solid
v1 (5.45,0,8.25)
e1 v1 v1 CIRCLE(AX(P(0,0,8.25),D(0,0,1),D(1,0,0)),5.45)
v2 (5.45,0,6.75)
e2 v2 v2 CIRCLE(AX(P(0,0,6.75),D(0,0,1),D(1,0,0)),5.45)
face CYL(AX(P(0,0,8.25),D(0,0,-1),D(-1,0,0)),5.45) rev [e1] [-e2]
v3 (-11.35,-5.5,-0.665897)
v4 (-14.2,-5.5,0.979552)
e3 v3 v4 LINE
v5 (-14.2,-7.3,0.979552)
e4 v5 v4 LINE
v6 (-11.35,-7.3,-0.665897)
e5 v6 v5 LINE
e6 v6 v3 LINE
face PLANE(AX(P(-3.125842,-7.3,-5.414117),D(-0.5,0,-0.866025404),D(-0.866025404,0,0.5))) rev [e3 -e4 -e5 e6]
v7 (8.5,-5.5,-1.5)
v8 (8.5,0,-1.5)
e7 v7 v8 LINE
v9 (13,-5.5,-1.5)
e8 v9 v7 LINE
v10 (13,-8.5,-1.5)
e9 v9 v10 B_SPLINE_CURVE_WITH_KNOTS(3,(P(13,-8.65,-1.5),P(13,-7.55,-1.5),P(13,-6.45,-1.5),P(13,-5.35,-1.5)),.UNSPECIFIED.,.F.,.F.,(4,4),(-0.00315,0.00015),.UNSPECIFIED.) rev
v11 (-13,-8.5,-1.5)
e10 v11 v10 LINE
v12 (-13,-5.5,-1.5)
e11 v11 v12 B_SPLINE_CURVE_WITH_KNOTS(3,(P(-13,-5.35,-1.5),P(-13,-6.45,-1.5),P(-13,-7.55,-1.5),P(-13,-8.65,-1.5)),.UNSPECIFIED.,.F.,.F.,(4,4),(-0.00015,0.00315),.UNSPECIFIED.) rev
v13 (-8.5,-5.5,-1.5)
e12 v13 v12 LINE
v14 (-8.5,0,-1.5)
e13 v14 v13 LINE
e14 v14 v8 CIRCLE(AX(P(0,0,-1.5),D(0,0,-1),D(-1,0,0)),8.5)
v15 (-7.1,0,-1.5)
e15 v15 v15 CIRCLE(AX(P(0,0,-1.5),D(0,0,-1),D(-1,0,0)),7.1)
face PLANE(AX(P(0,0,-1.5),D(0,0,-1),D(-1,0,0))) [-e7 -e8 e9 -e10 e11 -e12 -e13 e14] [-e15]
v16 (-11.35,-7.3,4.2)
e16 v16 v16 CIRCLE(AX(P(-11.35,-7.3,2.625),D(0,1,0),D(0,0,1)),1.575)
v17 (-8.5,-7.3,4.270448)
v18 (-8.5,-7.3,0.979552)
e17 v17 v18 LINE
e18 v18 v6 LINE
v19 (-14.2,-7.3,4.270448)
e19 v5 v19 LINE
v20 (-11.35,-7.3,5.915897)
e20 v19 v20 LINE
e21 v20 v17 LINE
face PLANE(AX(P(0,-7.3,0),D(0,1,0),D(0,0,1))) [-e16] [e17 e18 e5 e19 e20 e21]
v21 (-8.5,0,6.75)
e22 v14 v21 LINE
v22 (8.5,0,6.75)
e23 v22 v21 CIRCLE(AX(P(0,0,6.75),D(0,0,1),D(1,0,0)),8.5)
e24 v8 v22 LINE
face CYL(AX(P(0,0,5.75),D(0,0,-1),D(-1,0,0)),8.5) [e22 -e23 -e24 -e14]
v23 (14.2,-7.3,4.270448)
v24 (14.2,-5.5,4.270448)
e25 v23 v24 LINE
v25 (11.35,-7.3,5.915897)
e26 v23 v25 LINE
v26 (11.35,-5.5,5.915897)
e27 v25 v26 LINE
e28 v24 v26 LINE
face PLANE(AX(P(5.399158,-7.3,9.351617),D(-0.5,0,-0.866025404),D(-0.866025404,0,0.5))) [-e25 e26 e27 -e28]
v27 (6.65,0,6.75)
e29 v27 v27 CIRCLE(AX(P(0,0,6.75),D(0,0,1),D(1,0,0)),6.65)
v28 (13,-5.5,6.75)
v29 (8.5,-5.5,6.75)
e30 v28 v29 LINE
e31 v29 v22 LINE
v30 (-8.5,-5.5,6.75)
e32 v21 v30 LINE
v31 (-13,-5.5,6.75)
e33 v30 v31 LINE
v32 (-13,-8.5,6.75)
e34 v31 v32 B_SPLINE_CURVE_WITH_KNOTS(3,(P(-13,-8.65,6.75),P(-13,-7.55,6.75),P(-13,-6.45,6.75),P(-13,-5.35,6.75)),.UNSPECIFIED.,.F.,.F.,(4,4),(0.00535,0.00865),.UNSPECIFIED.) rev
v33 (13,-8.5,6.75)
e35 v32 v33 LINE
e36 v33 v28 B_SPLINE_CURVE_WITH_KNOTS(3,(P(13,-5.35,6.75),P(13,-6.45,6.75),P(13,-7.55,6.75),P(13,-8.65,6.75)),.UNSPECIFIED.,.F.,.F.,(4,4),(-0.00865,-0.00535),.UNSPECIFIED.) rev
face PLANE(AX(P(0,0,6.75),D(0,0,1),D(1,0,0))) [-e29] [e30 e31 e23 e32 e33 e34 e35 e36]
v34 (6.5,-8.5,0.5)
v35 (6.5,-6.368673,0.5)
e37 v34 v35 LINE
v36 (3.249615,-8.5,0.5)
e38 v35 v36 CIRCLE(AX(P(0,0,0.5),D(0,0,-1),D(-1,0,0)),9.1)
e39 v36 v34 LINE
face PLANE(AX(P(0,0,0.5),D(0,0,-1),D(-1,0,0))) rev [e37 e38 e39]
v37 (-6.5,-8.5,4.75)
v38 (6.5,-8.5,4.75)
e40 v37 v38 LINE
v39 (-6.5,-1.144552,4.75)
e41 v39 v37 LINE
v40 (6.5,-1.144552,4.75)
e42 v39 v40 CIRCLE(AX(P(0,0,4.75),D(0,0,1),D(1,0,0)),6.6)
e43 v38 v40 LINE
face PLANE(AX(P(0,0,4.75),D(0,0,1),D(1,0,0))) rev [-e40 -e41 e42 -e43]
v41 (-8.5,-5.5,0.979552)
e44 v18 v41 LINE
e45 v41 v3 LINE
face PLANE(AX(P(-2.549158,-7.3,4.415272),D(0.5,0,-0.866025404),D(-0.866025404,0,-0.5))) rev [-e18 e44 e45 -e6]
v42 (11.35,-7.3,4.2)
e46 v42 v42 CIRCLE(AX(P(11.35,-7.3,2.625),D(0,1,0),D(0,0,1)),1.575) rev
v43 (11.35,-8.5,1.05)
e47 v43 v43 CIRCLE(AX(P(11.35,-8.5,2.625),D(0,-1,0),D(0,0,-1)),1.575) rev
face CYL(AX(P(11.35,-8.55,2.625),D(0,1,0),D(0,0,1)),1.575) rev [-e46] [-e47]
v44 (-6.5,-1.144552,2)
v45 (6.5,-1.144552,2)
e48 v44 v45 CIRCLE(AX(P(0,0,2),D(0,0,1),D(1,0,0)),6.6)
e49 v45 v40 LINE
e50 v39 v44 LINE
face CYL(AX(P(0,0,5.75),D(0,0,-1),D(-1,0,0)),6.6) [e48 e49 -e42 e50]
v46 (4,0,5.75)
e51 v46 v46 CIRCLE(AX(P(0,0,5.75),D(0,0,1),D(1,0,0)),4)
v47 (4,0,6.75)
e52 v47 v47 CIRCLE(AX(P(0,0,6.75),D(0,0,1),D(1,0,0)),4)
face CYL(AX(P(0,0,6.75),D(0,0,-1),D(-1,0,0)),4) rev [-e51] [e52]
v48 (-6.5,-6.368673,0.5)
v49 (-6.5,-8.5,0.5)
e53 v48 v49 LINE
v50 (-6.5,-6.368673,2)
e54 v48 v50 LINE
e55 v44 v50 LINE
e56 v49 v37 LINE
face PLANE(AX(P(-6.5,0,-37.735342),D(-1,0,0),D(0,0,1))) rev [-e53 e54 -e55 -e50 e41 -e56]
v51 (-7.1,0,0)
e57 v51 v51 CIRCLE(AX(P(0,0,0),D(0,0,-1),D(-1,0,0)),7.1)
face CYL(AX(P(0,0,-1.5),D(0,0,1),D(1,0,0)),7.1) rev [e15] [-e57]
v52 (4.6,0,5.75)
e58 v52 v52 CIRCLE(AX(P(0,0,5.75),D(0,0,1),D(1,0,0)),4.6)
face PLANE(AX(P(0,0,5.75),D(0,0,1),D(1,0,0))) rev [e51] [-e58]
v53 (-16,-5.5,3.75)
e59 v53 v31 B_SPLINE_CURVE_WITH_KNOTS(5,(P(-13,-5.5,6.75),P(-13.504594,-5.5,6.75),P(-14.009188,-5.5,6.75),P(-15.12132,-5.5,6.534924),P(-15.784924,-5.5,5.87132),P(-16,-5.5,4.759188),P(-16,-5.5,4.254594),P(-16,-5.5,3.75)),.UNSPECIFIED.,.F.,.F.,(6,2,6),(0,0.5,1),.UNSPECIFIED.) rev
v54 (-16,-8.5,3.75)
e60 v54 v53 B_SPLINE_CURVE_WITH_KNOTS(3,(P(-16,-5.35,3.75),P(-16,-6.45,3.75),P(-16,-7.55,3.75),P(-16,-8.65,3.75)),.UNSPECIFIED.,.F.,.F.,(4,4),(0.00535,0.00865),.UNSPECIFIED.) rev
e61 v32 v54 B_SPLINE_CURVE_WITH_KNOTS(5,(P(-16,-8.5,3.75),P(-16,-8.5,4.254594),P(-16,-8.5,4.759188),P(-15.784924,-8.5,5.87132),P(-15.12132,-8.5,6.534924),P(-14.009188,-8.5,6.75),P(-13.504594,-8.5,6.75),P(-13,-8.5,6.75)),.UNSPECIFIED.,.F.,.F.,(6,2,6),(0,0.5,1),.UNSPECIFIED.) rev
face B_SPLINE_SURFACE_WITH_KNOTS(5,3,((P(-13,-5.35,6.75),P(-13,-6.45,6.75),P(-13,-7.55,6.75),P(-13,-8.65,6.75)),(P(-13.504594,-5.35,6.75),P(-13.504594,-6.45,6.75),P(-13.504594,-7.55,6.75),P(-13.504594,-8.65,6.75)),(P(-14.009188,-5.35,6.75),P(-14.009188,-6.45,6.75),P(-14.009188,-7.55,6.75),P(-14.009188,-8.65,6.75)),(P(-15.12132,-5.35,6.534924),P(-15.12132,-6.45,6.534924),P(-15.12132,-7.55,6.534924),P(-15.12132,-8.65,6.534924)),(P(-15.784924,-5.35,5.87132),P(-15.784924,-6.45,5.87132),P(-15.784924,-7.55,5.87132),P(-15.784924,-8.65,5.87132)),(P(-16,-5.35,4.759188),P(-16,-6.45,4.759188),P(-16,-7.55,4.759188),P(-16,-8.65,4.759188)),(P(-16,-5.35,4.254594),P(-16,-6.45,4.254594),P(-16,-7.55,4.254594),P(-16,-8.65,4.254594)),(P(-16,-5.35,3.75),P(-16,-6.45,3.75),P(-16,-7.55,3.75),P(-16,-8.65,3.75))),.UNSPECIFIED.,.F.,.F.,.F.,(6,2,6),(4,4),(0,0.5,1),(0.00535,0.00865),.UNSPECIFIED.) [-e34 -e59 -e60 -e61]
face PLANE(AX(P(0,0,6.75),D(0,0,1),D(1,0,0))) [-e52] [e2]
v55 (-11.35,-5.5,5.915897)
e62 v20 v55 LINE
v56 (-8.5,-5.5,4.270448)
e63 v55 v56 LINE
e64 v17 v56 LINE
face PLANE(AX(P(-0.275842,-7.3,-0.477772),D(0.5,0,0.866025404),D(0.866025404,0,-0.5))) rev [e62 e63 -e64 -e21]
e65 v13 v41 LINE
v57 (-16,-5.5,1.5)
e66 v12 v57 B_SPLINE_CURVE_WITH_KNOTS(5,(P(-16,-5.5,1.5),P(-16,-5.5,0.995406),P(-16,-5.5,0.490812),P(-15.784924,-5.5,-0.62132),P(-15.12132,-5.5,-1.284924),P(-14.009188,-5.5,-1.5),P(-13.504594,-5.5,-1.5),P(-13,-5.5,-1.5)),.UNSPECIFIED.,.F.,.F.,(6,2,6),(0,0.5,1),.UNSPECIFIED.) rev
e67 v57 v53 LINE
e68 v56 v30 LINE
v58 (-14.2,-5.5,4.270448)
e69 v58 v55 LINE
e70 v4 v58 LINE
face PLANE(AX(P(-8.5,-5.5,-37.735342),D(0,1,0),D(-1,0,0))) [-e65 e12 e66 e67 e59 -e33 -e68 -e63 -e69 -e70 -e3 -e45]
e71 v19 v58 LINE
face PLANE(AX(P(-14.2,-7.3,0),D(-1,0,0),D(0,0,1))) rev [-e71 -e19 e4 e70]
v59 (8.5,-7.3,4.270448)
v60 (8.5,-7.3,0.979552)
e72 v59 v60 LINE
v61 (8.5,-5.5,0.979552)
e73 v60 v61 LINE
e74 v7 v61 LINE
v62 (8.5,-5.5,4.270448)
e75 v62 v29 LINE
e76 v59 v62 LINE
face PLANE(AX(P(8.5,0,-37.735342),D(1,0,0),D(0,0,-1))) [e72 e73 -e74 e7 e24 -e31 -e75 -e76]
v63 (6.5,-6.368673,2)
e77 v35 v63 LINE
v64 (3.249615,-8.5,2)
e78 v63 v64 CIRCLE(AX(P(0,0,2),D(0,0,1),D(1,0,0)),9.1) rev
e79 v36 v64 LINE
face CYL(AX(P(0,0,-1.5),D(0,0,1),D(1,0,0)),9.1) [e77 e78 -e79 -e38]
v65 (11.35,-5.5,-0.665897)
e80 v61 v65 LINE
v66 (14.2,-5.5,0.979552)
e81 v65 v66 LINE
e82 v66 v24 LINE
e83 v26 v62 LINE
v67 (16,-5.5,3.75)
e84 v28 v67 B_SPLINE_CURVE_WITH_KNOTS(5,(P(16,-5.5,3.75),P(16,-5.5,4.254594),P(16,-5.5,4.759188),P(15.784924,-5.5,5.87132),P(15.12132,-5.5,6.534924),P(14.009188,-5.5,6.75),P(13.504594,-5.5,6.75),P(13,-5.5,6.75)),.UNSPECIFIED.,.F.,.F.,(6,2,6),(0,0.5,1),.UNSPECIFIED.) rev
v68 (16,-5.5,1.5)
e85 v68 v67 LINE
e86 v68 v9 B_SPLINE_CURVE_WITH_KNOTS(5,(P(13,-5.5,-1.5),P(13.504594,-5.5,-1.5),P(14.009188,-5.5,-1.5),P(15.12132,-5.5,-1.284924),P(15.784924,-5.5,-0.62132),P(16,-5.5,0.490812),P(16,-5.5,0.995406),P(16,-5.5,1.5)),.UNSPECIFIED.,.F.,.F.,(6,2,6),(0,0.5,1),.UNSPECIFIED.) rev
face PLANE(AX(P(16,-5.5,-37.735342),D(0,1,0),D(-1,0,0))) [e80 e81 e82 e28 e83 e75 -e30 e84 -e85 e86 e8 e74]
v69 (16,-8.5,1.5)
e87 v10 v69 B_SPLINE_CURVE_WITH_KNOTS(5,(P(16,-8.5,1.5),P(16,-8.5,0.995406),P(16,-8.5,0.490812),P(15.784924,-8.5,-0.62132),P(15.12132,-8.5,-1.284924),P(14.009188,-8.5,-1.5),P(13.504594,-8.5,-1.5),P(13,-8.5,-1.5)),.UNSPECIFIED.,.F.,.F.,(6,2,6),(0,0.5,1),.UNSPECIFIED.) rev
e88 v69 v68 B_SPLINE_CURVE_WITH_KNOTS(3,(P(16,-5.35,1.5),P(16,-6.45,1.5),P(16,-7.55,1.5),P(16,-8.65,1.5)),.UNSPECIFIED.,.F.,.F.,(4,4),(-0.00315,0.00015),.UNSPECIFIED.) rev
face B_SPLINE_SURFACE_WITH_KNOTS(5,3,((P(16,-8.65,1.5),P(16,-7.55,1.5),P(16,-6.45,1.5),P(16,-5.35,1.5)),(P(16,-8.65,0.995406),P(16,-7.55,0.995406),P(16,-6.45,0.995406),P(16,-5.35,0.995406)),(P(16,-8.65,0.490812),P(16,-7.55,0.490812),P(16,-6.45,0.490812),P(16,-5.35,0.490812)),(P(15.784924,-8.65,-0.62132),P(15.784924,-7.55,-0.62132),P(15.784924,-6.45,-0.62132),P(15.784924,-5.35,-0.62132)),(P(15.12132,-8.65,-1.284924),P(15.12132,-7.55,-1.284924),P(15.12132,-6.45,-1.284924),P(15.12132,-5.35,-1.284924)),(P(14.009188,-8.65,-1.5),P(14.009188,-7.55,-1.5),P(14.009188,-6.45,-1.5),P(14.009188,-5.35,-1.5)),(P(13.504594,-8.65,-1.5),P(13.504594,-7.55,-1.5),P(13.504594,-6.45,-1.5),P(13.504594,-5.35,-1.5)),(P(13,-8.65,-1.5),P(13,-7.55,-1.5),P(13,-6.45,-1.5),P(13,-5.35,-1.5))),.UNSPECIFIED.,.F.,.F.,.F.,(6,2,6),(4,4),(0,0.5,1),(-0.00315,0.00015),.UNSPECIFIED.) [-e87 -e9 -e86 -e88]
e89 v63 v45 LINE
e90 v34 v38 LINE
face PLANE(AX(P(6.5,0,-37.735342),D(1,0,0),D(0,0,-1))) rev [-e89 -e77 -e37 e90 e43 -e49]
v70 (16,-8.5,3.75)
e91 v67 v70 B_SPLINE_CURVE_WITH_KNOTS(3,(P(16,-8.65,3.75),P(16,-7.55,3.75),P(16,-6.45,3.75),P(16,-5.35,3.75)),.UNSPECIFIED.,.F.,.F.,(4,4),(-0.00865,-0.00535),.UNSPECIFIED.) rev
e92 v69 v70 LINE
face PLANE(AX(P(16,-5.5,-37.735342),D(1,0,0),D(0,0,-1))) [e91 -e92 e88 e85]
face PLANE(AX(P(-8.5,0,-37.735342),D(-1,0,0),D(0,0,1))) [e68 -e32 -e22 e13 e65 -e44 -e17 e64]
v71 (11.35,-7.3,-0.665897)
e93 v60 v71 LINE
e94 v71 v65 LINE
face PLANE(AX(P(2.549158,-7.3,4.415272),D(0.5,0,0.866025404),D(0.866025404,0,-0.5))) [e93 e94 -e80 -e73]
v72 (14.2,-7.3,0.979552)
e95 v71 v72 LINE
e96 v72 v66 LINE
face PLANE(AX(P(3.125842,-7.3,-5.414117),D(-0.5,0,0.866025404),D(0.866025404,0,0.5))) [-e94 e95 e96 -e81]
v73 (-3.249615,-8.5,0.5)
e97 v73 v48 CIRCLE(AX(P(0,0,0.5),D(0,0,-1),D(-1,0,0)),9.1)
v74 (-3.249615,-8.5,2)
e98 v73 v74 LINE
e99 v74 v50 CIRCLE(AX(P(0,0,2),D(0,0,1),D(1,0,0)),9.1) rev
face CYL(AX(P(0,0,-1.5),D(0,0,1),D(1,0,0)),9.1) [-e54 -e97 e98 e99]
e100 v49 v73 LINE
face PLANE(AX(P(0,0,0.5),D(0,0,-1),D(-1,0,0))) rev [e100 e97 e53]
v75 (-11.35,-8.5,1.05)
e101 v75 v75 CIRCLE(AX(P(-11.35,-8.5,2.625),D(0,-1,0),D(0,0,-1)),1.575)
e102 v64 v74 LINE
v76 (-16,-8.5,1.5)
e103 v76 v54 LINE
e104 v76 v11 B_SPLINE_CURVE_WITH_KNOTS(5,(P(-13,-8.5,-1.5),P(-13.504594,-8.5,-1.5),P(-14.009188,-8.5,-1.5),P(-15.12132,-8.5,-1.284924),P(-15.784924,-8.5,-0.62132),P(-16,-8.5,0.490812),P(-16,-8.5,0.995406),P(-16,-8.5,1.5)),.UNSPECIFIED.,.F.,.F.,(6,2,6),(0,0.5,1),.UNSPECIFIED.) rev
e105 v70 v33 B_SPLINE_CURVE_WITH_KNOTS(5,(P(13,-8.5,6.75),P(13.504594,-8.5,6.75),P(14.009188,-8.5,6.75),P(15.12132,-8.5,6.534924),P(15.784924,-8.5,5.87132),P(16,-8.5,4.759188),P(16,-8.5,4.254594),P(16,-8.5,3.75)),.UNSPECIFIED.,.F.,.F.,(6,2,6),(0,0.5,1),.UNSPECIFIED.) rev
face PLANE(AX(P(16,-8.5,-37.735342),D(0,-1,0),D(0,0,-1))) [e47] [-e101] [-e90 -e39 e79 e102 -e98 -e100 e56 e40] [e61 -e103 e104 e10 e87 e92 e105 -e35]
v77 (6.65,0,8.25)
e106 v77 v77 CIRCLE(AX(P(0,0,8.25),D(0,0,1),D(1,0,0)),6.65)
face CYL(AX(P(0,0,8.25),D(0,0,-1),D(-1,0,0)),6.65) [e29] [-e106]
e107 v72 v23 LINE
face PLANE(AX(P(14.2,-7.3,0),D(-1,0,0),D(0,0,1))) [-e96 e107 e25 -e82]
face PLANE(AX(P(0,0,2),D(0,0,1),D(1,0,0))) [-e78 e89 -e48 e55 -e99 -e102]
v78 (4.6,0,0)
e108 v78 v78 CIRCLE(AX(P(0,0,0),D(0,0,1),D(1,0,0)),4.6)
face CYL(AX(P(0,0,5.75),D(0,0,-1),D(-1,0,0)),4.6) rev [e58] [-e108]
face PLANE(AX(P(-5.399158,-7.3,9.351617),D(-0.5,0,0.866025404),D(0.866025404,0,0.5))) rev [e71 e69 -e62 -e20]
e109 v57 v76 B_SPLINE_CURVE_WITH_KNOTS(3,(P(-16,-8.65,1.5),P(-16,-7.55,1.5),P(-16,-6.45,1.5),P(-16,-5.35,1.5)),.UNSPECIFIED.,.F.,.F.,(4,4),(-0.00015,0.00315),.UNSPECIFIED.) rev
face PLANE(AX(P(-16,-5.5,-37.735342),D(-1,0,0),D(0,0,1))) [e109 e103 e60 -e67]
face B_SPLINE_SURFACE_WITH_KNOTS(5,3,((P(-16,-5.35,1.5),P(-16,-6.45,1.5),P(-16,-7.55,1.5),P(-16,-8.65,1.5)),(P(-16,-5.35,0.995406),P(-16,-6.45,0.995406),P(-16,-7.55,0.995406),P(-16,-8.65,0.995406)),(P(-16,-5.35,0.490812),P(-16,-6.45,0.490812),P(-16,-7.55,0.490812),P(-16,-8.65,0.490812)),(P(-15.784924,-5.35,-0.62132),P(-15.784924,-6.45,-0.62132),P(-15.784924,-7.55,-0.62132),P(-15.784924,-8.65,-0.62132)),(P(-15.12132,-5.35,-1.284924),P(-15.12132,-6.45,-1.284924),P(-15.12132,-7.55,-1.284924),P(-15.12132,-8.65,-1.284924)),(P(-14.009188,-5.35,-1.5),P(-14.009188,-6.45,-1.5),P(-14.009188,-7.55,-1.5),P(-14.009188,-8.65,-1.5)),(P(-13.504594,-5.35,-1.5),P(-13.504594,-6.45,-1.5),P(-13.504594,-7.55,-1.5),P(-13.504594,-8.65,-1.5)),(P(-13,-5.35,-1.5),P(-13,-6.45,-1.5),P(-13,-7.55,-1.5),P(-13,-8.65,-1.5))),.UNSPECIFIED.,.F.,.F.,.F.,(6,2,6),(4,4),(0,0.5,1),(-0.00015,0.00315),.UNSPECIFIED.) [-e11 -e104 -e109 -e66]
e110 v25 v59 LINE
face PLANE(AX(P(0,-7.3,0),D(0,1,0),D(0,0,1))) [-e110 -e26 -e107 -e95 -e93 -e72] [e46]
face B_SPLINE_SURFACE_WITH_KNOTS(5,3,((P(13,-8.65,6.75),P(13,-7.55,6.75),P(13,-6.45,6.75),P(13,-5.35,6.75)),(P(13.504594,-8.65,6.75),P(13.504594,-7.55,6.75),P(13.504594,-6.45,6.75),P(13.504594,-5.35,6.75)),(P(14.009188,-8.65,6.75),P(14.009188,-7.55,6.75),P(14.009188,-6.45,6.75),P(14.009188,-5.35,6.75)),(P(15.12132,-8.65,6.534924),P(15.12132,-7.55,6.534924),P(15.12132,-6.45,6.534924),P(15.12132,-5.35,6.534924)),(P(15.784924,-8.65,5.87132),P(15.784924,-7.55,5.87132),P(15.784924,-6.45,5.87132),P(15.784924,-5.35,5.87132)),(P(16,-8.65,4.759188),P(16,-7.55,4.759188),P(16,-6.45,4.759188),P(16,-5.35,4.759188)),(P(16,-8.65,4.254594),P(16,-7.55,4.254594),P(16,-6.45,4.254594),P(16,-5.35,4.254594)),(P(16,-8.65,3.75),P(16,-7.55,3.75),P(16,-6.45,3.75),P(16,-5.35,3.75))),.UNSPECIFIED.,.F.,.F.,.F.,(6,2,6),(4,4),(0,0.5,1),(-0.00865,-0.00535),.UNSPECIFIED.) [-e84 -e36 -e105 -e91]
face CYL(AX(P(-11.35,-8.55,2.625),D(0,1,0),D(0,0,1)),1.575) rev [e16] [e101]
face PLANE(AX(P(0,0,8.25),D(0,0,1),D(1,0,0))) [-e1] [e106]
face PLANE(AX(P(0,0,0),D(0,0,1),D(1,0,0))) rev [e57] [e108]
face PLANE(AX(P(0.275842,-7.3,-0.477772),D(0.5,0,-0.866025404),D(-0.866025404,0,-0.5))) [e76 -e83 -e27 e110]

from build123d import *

# Parameters (mm, degrees)
SKETCH1_R           = 8.5
SKETCH1_R_2         = 4.6
BOSS_EXTRUDE1_DEPTH = 5.75
BOSS_EXTRUDE2_START = 1.5
SKETCH2_R           = 8.5
SKETCH2_R_2         = 7.1
BOSS_EXTRUDE2_DEPTH = 1.5
SKETCH3_R           = 8.5
SKETCH3_R_2         = 4
BOSS_EXTRUDE3_DEPTH = 1
SKETCH4_R           = 6.65
SKETCH4_R_2         = 5.45
BOSS_EXTRUDE4_DEPTH = 1.5
BOSS_EXTRUDE5_START = -8.25
SKETCH5_R           = 7.1
BOSS_EXTRUDE5_DEPTH = 8.25
FILLET1_SIZE        = 3
SKETCH6_R           = 1.575
CUT_EXTRUDE1_DEPTH  = 1.8
SKETCH6_3_R         = 1.575
CUT_EXTRUDE2_DEPTH  = 23.804878934
SHELL1_START        = 2
SHELL1_DEPTH        = 2.75
SHELL1_START_2      = 0.5
SHELL1_2_DEPTH      = 1.5


with BuildPart() as part:
    # Sketch1 → Boss-Extrude1 (new body)
    with BuildSketch(Plane.XY):
        Circle(SKETCH1_R)
        Circle(SKETCH1_R_2, mode=Mode.SUBTRACT)
    extrude(amount=BOSS_EXTRUDE1_DEPTH)

    # Sketch2 → Boss-Extrude2 (add)
    with BuildSketch(Plane(origin=(0, 0, 0), x_dir=(-1, 0, 0), z_dir=(0, 0, -1)).offset(BOSS_EXTRUDE2_START)):
        Circle(SKETCH2_R)
        Circle(SKETCH2_R_2, mode=Mode.SUBTRACT)
    extrude(amount=-BOSS_EXTRUDE2_DEPTH)

    # Sketch3 → Boss-Extrude3 (add)
    with BuildSketch(Plane.XY.offset(5.75)):
        with Locations(Location((0, 0, 0), (0, 0, 180))):
            Circle(SKETCH3_R)
        Circle(SKETCH3_R_2, mode=Mode.SUBTRACT)
    extrude(amount=BOSS_EXTRUDE3_DEPTH)

    # Sketch4 → Boss-Extrude4 (add)
    with BuildSketch(Plane.XY.offset(6.75)):
        Circle(SKETCH4_R)
        Circle(SKETCH4_R_2, mode=Mode.SUBTRACT)
    extrude(amount=BOSS_EXTRUDE4_DEPTH)

    # Sketch5 → Boss-Extrude5 (add)
    with BuildSketch(Plane.XY.offset(6.75).offset(BOSS_EXTRUDE5_START)):
        with BuildLine():
            Line((-8.5, 0), (-8.5, -5.5))
            Line((-8.5, -5.5), (-16, -5.5))
            Line((-16, -5.5), (-16, -8.5))
            Line((-16, -8.5), (16, -8.5))
            Line((16, -8.5), (16, -5.5))
            Line((16, -5.5), (8.5, -5.5))
            Line((8.5, -5.5), (8.5, 0))
            ThreePointArc((8.5, 0), (0, 8.5), (-8.5, 0))
        make_face()
        with Locations(Location((0, 0, 0), (0, 0, 180))):
            Circle(SKETCH5_R, mode=Mode.SUBTRACT)
    extrude(amount=BOSS_EXTRUDE5_DEPTH)

    # Fillet1
    # a fillet whose section is not a circle: 3 mm, written as the material it takes off along each edge
    with BuildSketch(Plane(origin=(-16, 2, -1.5), x_dir=(0, 0, 1), z_dir=(0, -1, 0)), Plane(origin=(-16, 2, 6.75), x_dir=(1, 0, 0), z_dir=(0, -1, 0)), Plane(origin=(16, -16, -1.5), x_dir=(0, 0, 1), z_dir=(0, 1, 0)), Plane(origin=(16, -16, 6.75), x_dir=(-1, 0, 0), z_dir=(0, 1, 0))) as fillet1_piece_1:
        with BuildLine():
            add(Edge.make_bspline([(FILLET1_SIZE, 0), (FILLET1_SIZE * 0.831801948466, 0), (FILLET1_SIZE * 0.663603896932, 0), (FILLET1_SIZE * 0.292893218813, -FILLET1_SIZE * 0.0716919198361), (FILLET1_SIZE * 0.0716919198361, -FILLET1_SIZE * 0.292893218813), (0, -FILLET1_SIZE * 0.663603896932), (0, -FILLET1_SIZE * 0.831801948466), (0, -FILLET1_SIZE)], knots=[0, 0, 0, 0, 0, 0, 0.5, 0.5, 1, 1, 1, 1, 1, 1], degree=5))
            Line((0, -FILLET1_SIZE), (0, 0))
            Line((0, 0), (FILLET1_SIZE, 0))
        make_face()
    extrude(amount=18, mode=Mode.SUBTRACT)

    # Sketch6 → Cut-Extrude1 (cut)
    # profile 1 of 2: a face of its own
    with BuildSketch(Plane(origin=(0, -5.5, 0), x_dir=(1, 0, 0), z_dir=(0, 1, 0))):
        Polygon((-11.35, 0.665896534), (-14.2, -0.979551733), (-14.2, -4.270448267), (-11.35, -5.915896534), (-8.5, -4.270448267), (-8.5, -0.979551733), align=None)
        with Locations((-11.35, -2.625)):
            Circle(SKETCH6_R, mode=Mode.SUBTRACT)
    # profile 2 of 2: a face of its own
    with BuildSketch(Plane(origin=(0, -5.5, 0), x_dir=(1, 0, 0), z_dir=(0, 1, 0))):
        with Locations((-11.35, -2.625)):
            Circle(SKETCH6_R)
    cut_extrude1 = extrude(amount=-CUT_EXTRUDE1_DEPTH, mode=Mode.SUBTRACT)

    # Sketch6<3> → Cut-Extrude2 (cut, through all)
    with BuildSketch(Plane(origin=(0, -5.5, 0), x_dir=(1, 0, 0), z_dir=(0, 1, 0))):
        with Locations(Location((-11.35, -2.625, 0), (0, 0, 270))):
            Circle(SKETCH6_3_R)
    cut_extrude2 = extrude(amount=-CUT_EXTRUDE2_DEPTH, mode=Mode.SUBTRACT)

    # Mirror1: Cut-Extrude1, Cut-Extrude2 across plane
    add(cut_extrude1.mirror(Plane(origin=(0, 0, 0), x_dir=(0, 0, 1), z_dir=(1, 0, 0))), mode=Mode.SUBTRACT)
    add(cut_extrude2.mirror(Plane(origin=(0, 0, 0), x_dir=(0, 0, 1), z_dir=(1, 0, 0))), mode=Mode.SUBTRACT)

    # Shell1: read off the stored shape, not the designer's step
    # Shell1 outline → Shell1 (cut)
    with BuildSketch(Plane.XY.offset(SHELL1_START)):
        with BuildLine():
            ThreePointArc((6.5, -1.144552314), (0, -6.6), (-6.5, -1.144552314))
            Line((-6.5, -1.144552314), (-6.5, -8.5))
            Line((-6.5, -8.5), (6.5, -8.5))
            Line((6.5, -8.5), (6.5, -1.144552314))
        make_face()
    extrude(amount=SHELL1_DEPTH, mode=Mode.SUBTRACT)

    # Shell1 2 outline → Shell1 2 (cut)
    with BuildSketch(Plane.XY.offset(SHELL1_START_2)):
        with BuildLine():
            Line((6.5, -8.5), (6.5, -6.368673331))
            ThreePointArc((6.5, -6.368673331), (4.989928684, -7.609902216), (3.249615362, -8.5))
            Line((3.249615362, -8.5), (6.5, -8.5))
        make_face()
        with BuildLine():
            ThreePointArc((-3.249615362, -8.5), (-4.989928684, -7.609902216), (-6.5, -6.368673331))
            Line((-6.5, -6.368673331), (-6.5, -8.5))
            Line((-6.5, -8.5), (-3.249615362, -8.5))
        make_face()
    extrude(amount=SHELL1_2_DEPTH, mode=Mode.SUBTRACT)


solid = part.part
